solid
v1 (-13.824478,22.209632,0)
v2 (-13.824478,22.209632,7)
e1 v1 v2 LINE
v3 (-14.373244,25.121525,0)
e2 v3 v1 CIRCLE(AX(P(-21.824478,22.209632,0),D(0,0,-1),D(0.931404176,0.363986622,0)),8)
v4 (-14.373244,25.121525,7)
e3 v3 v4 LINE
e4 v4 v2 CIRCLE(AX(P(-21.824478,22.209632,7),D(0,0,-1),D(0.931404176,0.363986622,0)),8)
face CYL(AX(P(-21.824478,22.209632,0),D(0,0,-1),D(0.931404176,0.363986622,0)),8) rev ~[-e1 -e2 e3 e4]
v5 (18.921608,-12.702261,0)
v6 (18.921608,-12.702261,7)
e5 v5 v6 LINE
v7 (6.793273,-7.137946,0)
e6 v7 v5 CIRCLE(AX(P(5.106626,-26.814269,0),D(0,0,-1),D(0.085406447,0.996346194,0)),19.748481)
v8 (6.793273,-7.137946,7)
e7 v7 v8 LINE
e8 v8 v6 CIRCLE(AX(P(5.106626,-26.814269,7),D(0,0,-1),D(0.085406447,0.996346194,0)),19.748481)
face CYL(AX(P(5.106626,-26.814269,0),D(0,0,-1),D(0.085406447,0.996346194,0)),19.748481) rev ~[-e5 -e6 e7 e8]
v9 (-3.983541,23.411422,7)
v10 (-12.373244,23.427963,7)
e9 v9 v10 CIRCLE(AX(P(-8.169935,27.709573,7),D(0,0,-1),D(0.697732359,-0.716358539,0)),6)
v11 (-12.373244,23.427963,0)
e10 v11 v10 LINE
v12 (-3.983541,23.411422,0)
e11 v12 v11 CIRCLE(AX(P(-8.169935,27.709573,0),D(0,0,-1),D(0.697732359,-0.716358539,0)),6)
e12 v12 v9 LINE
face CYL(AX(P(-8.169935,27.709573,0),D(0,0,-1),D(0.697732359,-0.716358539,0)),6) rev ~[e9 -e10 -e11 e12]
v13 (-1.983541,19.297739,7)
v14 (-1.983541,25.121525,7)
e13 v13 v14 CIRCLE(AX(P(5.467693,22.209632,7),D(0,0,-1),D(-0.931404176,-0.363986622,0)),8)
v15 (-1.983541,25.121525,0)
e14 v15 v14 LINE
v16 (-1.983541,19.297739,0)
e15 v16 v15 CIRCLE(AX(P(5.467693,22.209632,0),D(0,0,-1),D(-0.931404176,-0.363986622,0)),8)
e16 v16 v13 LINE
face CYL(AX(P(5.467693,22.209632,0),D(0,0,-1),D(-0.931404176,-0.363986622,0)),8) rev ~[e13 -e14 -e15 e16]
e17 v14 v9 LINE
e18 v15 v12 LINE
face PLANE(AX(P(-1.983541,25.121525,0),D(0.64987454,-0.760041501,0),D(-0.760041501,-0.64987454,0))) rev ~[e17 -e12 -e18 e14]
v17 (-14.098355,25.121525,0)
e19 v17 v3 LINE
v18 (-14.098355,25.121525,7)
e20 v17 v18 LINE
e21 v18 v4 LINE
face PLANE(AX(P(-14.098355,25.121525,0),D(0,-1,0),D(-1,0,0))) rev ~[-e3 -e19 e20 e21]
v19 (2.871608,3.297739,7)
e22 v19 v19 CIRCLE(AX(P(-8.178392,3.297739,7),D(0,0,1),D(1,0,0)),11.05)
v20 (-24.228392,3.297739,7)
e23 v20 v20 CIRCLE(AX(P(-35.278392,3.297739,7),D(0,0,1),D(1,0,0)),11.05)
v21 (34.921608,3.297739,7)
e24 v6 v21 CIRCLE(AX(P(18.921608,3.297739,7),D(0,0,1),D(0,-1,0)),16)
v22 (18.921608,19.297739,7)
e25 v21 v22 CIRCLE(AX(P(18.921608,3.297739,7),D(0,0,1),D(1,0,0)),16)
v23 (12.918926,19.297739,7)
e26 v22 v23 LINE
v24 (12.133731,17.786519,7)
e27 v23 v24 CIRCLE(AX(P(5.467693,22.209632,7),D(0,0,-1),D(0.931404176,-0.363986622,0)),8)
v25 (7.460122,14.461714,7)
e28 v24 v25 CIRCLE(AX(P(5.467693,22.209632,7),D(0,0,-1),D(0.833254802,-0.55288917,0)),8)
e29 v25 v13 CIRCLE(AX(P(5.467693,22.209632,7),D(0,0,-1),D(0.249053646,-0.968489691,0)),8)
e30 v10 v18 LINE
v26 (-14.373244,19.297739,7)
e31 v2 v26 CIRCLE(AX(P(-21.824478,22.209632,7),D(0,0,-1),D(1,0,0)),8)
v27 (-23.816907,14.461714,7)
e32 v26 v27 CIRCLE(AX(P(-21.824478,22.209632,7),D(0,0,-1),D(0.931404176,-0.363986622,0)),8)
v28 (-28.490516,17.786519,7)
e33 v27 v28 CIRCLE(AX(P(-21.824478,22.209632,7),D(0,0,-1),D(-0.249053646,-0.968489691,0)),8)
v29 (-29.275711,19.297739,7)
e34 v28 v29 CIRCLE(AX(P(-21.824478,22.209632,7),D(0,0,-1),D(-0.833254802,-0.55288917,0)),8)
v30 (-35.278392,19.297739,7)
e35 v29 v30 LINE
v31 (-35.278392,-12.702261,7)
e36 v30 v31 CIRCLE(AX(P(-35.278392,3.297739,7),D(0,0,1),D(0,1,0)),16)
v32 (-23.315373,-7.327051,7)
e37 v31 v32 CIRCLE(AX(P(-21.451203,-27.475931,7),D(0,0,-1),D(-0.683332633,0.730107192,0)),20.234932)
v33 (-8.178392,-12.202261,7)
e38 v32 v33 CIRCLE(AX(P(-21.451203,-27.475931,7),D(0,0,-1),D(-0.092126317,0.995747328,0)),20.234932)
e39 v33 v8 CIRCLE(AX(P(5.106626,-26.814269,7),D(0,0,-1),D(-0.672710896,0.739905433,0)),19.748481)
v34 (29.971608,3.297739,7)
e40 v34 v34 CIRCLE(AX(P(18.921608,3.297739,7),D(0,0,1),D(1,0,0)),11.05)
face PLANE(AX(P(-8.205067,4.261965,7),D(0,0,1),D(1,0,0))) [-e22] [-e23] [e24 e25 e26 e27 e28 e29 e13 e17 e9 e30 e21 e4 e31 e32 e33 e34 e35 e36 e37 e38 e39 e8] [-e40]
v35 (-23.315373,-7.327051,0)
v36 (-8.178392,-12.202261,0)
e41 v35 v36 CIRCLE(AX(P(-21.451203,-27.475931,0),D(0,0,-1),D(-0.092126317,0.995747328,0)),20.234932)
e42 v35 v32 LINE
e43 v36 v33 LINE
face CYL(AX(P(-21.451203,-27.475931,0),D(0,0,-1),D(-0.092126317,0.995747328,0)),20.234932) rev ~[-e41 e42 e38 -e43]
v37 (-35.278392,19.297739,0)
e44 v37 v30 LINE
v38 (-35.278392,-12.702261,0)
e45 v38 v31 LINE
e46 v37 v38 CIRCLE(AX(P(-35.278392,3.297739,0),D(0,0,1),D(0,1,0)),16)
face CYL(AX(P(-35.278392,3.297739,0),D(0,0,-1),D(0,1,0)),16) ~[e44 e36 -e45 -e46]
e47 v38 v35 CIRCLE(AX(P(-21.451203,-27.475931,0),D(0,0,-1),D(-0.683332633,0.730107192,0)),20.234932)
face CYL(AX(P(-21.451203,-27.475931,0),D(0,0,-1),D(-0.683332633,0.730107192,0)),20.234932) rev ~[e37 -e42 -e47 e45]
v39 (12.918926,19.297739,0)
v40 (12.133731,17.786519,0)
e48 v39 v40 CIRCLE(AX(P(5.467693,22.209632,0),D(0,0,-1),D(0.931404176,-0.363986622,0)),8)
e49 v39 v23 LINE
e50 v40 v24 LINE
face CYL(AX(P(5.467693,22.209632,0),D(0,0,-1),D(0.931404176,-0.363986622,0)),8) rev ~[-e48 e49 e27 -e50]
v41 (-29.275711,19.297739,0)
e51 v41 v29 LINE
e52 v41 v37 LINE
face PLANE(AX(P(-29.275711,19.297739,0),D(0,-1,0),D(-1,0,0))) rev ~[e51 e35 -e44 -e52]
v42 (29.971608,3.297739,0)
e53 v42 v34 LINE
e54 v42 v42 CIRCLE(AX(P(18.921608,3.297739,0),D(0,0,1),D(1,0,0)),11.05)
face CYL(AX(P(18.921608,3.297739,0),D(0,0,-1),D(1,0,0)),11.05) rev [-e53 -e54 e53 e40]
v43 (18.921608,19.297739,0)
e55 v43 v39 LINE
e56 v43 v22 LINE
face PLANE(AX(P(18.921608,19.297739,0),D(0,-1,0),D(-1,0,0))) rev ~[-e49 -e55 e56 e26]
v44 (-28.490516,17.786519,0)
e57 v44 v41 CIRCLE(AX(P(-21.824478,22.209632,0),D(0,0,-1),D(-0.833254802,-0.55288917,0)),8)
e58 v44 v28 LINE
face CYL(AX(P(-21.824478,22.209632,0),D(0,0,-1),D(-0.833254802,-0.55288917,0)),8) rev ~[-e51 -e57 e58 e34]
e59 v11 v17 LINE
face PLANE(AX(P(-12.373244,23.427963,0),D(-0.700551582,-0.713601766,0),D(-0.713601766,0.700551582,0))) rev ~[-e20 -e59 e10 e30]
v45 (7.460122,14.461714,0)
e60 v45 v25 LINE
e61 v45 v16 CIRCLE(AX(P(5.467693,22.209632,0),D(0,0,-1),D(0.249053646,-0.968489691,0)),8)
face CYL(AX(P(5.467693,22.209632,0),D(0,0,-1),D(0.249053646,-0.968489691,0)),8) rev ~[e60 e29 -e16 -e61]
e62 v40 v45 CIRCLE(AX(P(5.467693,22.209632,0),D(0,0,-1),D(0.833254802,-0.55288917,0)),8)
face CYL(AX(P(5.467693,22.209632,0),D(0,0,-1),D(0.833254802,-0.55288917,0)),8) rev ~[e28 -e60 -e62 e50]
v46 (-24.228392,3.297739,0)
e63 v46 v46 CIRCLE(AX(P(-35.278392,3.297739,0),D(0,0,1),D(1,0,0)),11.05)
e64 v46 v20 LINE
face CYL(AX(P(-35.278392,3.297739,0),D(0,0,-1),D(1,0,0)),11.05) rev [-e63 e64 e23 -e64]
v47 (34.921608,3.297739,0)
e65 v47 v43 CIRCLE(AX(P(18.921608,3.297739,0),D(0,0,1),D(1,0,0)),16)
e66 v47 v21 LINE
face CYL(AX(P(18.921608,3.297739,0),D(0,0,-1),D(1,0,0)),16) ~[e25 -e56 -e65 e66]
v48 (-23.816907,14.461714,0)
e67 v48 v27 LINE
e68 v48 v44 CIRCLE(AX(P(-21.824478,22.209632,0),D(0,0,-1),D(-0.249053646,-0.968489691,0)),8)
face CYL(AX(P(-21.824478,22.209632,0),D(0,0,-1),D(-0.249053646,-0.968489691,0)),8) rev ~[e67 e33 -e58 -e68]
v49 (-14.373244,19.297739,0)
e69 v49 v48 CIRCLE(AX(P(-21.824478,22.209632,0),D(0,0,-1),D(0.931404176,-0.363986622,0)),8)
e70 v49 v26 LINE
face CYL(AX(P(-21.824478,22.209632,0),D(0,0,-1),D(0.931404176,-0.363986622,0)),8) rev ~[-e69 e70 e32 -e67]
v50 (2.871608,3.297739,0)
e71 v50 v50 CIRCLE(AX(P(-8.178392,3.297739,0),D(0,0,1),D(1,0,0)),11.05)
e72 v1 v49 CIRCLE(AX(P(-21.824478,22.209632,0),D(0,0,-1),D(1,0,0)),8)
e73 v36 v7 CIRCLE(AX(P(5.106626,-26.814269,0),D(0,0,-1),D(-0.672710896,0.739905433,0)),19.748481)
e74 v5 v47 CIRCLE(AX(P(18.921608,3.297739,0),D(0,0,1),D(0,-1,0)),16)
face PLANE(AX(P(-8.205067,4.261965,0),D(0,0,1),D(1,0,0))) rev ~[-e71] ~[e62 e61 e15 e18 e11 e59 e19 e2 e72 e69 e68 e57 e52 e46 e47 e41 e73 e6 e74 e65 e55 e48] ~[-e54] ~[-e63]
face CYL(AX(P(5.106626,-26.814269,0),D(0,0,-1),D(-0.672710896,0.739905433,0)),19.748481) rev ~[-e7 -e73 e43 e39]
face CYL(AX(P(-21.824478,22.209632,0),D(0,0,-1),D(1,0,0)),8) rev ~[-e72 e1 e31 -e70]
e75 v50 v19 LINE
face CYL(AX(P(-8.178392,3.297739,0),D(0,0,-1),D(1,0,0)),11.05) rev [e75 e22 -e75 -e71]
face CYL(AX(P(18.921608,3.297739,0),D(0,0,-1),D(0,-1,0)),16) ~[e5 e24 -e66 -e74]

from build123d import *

# Parameters (mm, degrees)
F0_R     = 11.05
F1_DEPTH = 7


# Not quite as in the source:
# - a feature names something its author has since deleted; it is built from what else it names


with BuildPart() as f1:
    # F0 (on Top) → F1 (new body)
    with BuildSketch(Plane.XY):
        with BuildLine():
            ThreePointArc((-19.2783924252, 3.2977389637), (-20.321649546, -2.3852041509), (-23.3153727308, -7.3270509067))
            ThreePointArc((-23.3153727308, -7.3270509067), (-15.247882117, -8.2153155431), (-8.1783924252, -12.2022610363))
            ThreePointArc((-8.1783924252, -12.2022610363), (-1.221278488, -8.1070481694), (6.7932734583, -7.1379455637))
            ThreePointArc((6.7932734583, -7.1379455637), (2.9292273158, 3.7914733565), (7.4601219716, 14.4617144101))
            ThreePointArc((7.4601219716, 14.4617144101), (1.8212672524, 15.0889872554), (-1.9835406039, 19.2977389637))
            Line((-1.9835406039, 19.2977389637), (-14.3732442464, 19.2977389637))
            ThreePointArc((-14.3732442464, 19.2977389637), (-18.1780521028, 15.0889872554), (-23.816906822, 14.4617144101))
            ThreePointArc((-23.816906822, 14.4617144101), (-20.4563856506, 9.3233605229), (-19.2783924252, 3.2977389637))
        make_face()
        with Locations((-8.1783924252, 3.2977389637)):
            Circle(F0_R, mode=Mode.SUBTRACT)
        with BuildLine():
            ThreePointArc((-28.490516072, 17.7865185747), (-31.8013587595, 18.915364804), (-35.2783924252, 19.2977389637))
            ThreePointArc((-35.2783924252, 19.2977389637), (-51.2783924252, 3.2977389637), (-35.2783924252, -12.7022610363))
            ThreePointArc((-35.2783924252, -12.7022610363), (-29.74444778, -9.0185588521), (-23.3153727308, -7.3270509067))
            ThreePointArc((-23.3153727308, -7.3270509067), (-20.321649546, -2.3852041509), (-19.2783924252, 3.2977389637))
            ThreePointArc((-19.2783924252, 3.2977389637), (-20.4563856506, 9.3233605229), (-23.816906822, 14.4617144101))
            ThreePointArc((-23.816906822, 14.4617144101), (-26.4619172405, 15.6908779087), (-28.490516072, 17.7865185747))
        make_face()
        with Locations((-35.2783924252, 3.2977389637)):
            Circle(F0_R, mode=Mode.SUBTRACT)
        with BuildLine():
            ThreePointArc((7.4601219716, 14.4617144101), (2.9292273158, 3.7914733565), (6.7932734583, -7.1379455637))
            ThreePointArc((6.7932734583, -7.1379455637), (13.3416443494, -8.8647019853), (18.9216075748, -12.7022610363))
            ThreePointArc((18.9216075748, -12.7022610363), (30.2353160738, -8.0159695352), (34.9216075748, 3.2977389637))
            ThreePointArc((34.9216075748, 3.2977389637), (30.2353160738, 14.6114474627), (18.9216075748, 19.2977389637))
            ThreePointArc((18.9216075748, 19.2977389637), (15.4445739091, 18.915364804), (12.1337312216, 17.7865185747))
            ThreePointArc((12.1337312216, 17.7865185747), (10.1051323901, 15.6908779087), (7.4601219716, 14.4617144101))
        make_face()
        with Locations((18.9216075748, 3.2977389637)):
            Circle(F0_R, mode=Mode.SUBTRACT)
        with BuildLine():
            Line((-29.2757110635, 19.2977389637), (-35.2783924252, 19.2977389637))
            ThreePointArc((-35.2783924252, 19.2977389637), (-31.8013587595, 18.915364804), (-28.490516072, 17.7865185747))
            ThreePointArc((-28.490516072, 17.7865185747), (-28.923441503, 18.5211753113), (-29.2757110635, 19.2977389637))
        make_face()
        with BuildLine():
            Line((18.9216075748, 19.2977389637), (12.9189262131, 19.2977389637))
            ThreePointArc((12.9189262131, 19.2977389637), (12.5666566526, 18.5211753113), (12.1337312216, 17.7865185747))
            ThreePointArc((12.1337312216, 17.7865185747), (15.4445739091, 18.915364804), (18.9216075748, 19.2977389637))
        make_face()
        with BuildLine():
            ThreePointArc((-13.824477655, 22.2096319377), (-13.9628662658, 20.7280563015), (-14.3732442464, 19.2977389637))
            Line((-14.3732442464, 19.2977389637), (-1.9835406039, 19.2977389637))
            ThreePointArc((-1.9835406039, 19.2977389637), (-2.5323071954, 22.2096319377), (-1.9835406039, 25.1215249117))
            Line((-1.9835406039, 25.1215249117), (-3.9835406039, 23.4114221363))
            ThreePointArc((-3.9835406039, 23.4114221363), (-8.1817639697, 21.709585029), (-12.3732442464, 23.4279627693))
            Line((-12.3732442464, 23.4279627693), (-14.0983548132, 25.1215249117))
            Line((-14.0983548132, 25.1215249117), (-14.3732442464, 25.1215249117))
            ThreePointArc((-14.3732442464, 25.1215249117), (-13.9628662658, 23.691207574), (-13.824477655, 22.2096319377))
        make_face()
    extrude(amount=F1_DEPTH)


solid = f1.part
